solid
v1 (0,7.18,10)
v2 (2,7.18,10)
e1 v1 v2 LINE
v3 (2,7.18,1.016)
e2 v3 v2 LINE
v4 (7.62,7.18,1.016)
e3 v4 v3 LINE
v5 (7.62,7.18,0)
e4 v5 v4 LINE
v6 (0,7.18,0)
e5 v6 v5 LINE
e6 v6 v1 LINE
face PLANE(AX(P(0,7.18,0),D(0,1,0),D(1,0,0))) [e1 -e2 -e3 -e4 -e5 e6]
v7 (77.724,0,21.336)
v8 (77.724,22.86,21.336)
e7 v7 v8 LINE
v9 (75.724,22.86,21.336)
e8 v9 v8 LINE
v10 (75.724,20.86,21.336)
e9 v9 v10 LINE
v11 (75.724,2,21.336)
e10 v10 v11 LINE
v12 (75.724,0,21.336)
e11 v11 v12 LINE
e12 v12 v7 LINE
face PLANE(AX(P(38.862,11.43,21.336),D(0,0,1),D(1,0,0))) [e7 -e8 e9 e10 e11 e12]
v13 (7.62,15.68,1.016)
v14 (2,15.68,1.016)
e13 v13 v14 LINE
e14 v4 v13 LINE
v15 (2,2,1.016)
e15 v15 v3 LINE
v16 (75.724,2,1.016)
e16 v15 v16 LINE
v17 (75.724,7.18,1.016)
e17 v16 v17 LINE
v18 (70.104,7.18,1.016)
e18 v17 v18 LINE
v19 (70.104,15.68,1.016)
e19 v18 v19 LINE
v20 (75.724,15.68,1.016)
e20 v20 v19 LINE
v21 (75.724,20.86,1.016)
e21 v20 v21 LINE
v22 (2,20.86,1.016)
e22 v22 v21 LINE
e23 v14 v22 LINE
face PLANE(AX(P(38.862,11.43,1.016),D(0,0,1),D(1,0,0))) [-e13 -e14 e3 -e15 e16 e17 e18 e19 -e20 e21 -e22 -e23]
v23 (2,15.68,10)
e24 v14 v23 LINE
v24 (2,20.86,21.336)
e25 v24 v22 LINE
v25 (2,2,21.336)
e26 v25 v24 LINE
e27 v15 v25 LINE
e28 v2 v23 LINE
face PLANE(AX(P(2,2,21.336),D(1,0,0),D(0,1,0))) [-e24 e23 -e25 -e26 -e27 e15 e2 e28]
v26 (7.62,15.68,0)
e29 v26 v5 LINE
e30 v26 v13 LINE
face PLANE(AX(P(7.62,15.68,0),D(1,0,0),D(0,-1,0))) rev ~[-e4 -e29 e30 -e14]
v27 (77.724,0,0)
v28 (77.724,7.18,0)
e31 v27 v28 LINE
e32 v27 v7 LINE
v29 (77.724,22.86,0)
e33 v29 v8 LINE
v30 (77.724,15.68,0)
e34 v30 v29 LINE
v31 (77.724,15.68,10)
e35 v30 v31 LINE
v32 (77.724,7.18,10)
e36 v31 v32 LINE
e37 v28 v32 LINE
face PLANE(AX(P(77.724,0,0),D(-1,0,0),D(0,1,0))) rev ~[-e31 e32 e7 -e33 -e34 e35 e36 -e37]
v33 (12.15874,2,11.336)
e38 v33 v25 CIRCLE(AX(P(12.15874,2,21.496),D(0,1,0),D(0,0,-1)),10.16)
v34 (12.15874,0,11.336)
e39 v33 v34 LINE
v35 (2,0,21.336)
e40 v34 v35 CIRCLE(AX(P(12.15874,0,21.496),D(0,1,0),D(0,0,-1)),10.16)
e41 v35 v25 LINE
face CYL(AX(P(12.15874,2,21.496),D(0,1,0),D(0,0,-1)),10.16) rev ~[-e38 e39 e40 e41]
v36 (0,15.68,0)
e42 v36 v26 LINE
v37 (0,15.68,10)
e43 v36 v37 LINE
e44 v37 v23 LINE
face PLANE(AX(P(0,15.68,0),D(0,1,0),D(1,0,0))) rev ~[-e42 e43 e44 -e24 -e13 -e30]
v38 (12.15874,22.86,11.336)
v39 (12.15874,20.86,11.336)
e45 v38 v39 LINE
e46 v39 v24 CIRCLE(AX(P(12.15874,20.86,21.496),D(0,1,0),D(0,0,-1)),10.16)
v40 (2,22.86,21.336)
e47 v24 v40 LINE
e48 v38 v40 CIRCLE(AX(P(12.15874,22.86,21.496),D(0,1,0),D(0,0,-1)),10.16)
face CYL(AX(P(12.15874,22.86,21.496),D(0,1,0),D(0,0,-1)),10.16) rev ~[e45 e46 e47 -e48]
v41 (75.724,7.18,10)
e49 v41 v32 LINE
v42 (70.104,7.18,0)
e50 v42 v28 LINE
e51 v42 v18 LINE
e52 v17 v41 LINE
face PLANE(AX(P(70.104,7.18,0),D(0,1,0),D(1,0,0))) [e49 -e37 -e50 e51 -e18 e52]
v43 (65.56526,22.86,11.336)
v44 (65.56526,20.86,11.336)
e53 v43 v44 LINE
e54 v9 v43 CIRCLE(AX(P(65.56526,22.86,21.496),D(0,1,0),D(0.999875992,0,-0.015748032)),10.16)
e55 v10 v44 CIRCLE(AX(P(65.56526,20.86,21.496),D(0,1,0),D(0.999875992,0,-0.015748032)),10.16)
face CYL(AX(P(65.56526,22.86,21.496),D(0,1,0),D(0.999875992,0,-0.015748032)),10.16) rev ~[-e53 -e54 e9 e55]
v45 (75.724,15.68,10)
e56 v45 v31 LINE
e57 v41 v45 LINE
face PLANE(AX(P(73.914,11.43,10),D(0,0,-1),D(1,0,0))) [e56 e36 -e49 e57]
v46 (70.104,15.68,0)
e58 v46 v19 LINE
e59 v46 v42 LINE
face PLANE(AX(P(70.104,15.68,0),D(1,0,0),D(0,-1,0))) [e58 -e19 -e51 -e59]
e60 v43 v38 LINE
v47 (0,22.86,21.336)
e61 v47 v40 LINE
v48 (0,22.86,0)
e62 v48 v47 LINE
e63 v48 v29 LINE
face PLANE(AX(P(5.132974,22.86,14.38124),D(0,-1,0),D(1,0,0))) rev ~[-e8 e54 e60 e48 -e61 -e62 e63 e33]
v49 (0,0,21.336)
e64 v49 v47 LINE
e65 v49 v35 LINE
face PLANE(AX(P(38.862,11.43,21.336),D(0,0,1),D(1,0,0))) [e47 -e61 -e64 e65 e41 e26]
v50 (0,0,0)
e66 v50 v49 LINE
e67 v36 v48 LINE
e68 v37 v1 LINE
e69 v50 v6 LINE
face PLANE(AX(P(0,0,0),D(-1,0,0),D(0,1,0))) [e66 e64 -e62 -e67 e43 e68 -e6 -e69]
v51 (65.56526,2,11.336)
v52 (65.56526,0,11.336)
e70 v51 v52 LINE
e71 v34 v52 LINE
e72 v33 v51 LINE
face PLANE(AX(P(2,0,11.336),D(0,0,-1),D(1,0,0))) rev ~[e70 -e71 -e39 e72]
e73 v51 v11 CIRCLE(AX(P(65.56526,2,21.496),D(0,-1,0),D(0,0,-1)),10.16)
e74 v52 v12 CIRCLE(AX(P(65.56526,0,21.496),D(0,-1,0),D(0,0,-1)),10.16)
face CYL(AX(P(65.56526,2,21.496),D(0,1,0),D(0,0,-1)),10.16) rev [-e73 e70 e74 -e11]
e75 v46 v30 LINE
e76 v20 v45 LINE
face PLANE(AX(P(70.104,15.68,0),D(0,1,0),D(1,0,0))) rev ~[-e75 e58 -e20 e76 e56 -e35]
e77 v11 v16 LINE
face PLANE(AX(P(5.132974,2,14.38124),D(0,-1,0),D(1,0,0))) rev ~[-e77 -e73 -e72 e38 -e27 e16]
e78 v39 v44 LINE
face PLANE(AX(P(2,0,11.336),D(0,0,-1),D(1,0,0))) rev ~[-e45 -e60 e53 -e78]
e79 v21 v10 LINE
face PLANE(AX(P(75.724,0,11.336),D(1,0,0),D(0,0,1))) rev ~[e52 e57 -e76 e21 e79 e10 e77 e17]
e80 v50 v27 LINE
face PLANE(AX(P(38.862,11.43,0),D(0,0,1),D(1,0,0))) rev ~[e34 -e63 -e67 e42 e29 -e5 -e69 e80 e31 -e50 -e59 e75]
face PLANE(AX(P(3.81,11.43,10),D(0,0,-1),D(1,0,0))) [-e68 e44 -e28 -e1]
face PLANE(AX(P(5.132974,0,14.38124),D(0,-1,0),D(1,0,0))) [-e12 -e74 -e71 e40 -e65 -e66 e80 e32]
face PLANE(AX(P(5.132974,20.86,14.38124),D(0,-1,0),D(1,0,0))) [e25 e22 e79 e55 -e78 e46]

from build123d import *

# Parameters (mm, degrees)
F0_W          = 77.724
F0_H          = 22.86
F1_DEPTH      = 21.336
F2_W          = 73.724
F2_H          = 18.86
F3_DEPTH      = 20.32
F4_W          = 7.62
F4_H          = 8.5
F5_DEPTH      = 10
F6_W          = 73.724
F6_H          = 10
F7_DEPTH      = 25
F7_DEPTH_BACK = 25
F8_T1_DEPTH   = 2
F8_T3_DEPTH   = 2
F8_T8_DEPTH   = 52.7937003968
F8_T14_DEPTH  = 52.7937003968
F8_T20_DEPTH  = 52.7937003968
F8_T26_DEPTH  = 52.7937003968


# Not quite as in the source:
# - a fillet or chamfer that OpenCascade refuses, or shapes differently, is made with other operations: its cross-section is extruded or revolved along the edge and cut away or added


with BuildPart() as f1:
    # F0 (on Top) → F1 (new body)
    with BuildSketch(Plane.XY):
        with Locations((38.862, 11.43)):
            Rectangle(F0_W, F0_H)
    extrude(amount=F1_DEPTH)

    # F2 (on face) → F3 (cut)
    with BuildSketch(Plane.XY.offset(21.336)):
        with Locations((38.862, 11.43)):
            Rectangle(F2_W, F2_H)
    extrude(amount=-F3_DEPTH, mode=Mode.SUBTRACT)

    # F4 (on face) → F5 (cut)
    with BuildSketch(Plane(origin=(0, 0, 0), x_dir=(1, 0, 0), z_dir=(0, 0, -1))):
        with Locations((3.81, -11.43)):
            Rectangle(F4_W, F4_H)
        with Locations((73.914, -11.43)):
            Rectangle(F4_W, F4_H)
    extrude(amount=-F5_DEPTH, mode=Mode.SUBTRACT)

    # F6 (on Front) → F7 (cut, two sides)
    with BuildSketch(Plane.XZ) as f7_sk:
        with Locations((38.862, 16.336)):
            Rectangle(F6_W, F6_H)
    extrude(amount=-F7_DEPTH, mode=Mode.SUBTRACT)
    extrude(f7_sk.sketch, amount=F7_DEPTH_BACK, mode=Mode.SUBTRACT)

    # F8: fillet of radius 10.16 on 4 edges, made by hand

    # F8_s2 → F8_t1 (join)
    with BuildSketch(Plane.XZ.offset(-2)):
        with BuildLine():
            ThreePointArc((12.1587400794, 11.336), (5.0313282069, 14.2554475349), (2, 21.336))
            Line((2, 21.336), (2, 11.336))
            Line((2, 11.336), (12.1587400794, 11.336))
        make_face()
        with BuildLine():
            ThreePointArc((65.5652599206, 11.336), (72.6926717931, 14.2554475349), (75.724, 21.336))
            Line((75.724, 21.336), (75.724, 11.336))
            Line((75.724, 11.336), (65.5652599206, 11.336))
        make_face()
    extrude(amount=F8_T1_DEPTH)

    # F8_s4 → F8_t3 (join)
    with BuildSketch(Plane.XZ.offset(-22.86)):
        with BuildLine():
            ThreePointArc((12.1587400794, 11.336), (5.0313282069, 14.2554475349), (2, 21.336))
            Line((2, 21.336), (2, 11.336))
            Line((2, 11.336), (12.1587400794, 11.336))
        make_face()
        with BuildLine():
            ThreePointArc((75.724, 21.336), (72.6926717931, 14.2554475349), (65.5652599206, 11.336))
            Line((65.5652599206, 11.336), (75.724, 11.336))
            Line((75.724, 11.336), (75.724, 21.336))
        make_face()
    extrude(amount=F8_T3_DEPTH)


with BuildPart() as f8_tool6:
    # F8_s7 → F8_t8 (new body)
    with BuildSketch(Plane.XZ.offset(-27.3968501984)):
        with BuildLine():
            ThreePointArc((12.1587400794, 11.336), (5.0313282069, 14.2554475349), (2, 21.336))
            Line((2, 21.336), (2, 11.336))
            Line((2, 11.336), (12.1587400794, 11.336))
        make_face()
    extrude(amount=F8_T8_DEPTH)

    split(bisect_by=Plane.XZ.offset(-22.86), keep=Keep.TOP)

    split(bisect_by=Plane.XZ.offset(-20.86), keep=Keep.BOTTOM)


with BuildPart() as f1_1:
    add(f1.part)

    # F8_t5: union F8_tool6
    add(f8_tool6.part)


with BuildPart() as f8_tool12:
    # F8_s13 → F8_t14 (new body)
    with BuildSketch(Plane.XZ.offset(-48.2568501984)):
        with BuildLine():
            ThreePointArc((12.1587400794, 11.336), (5.0313282069, 14.2554475349), (2, 21.336))
            Line((2, 21.336), (2, 11.336))
            Line((2, 11.336), (12.1587400794, 11.336))
        make_face()
    extrude(amount=F8_T14_DEPTH)

    split(bisect_by=Plane.XZ.offset(-2), keep=Keep.TOP)

    split(bisect_by=Plane.XZ, keep=Keep.BOTTOM)


with BuildPart() as f1_2:
    add(f1_1.part)

    # F8_t11: union F8_tool12
    add(f8_tool12.part)


with BuildPart() as f8_tool18:
    # F8_s19 → F8_t20 (new body)
    with BuildSketch(Plane.XZ.offset(25.3968501984)):
        with BuildLine():
            ThreePointArc((65.5652599206, 11.336), (72.6926717931, 14.2554475349), (75.724, 21.336))
            Line((75.724, 21.336), (75.724, 11.336))
            Line((75.724, 11.336), (65.5652599206, 11.336))
        make_face()
    extrude(amount=-F8_T20_DEPTH)

    split(bisect_by=Plane.XZ.offset(-22.86), keep=Keep.TOP)

    split(bisect_by=Plane.XZ.offset(-20.86), keep=Keep.BOTTOM)


with BuildPart() as f1_3:
    add(f1_2.part)

    # F8_t17: union F8_tool18
    add(f8_tool18.part)


with BuildPart() as f8_tool24:
    # F8_s25 → F8_t26 (new body)
    with BuildSketch(Plane.XZ.offset(4.5368501984)):
        with BuildLine():
            ThreePointArc((75.724, 21.336), (72.6926717931, 14.2554475349), (65.5652599206, 11.336))
            Line((65.5652599206, 11.336), (75.724, 11.336))
            Line((75.724, 11.336), (75.724, 21.336))
        make_face()
    extrude(amount=-F8_T26_DEPTH)

    split(bisect_by=Plane.XZ.offset(-2), keep=Keep.TOP)

    split(bisect_by=Plane.XZ, keep=Keep.BOTTOM)


with BuildPart() as f1_4:
    add(f1_3.part)

    # F8_t23: union F8_tool24
    add(f8_tool24.part)


solid = f1_4.part
